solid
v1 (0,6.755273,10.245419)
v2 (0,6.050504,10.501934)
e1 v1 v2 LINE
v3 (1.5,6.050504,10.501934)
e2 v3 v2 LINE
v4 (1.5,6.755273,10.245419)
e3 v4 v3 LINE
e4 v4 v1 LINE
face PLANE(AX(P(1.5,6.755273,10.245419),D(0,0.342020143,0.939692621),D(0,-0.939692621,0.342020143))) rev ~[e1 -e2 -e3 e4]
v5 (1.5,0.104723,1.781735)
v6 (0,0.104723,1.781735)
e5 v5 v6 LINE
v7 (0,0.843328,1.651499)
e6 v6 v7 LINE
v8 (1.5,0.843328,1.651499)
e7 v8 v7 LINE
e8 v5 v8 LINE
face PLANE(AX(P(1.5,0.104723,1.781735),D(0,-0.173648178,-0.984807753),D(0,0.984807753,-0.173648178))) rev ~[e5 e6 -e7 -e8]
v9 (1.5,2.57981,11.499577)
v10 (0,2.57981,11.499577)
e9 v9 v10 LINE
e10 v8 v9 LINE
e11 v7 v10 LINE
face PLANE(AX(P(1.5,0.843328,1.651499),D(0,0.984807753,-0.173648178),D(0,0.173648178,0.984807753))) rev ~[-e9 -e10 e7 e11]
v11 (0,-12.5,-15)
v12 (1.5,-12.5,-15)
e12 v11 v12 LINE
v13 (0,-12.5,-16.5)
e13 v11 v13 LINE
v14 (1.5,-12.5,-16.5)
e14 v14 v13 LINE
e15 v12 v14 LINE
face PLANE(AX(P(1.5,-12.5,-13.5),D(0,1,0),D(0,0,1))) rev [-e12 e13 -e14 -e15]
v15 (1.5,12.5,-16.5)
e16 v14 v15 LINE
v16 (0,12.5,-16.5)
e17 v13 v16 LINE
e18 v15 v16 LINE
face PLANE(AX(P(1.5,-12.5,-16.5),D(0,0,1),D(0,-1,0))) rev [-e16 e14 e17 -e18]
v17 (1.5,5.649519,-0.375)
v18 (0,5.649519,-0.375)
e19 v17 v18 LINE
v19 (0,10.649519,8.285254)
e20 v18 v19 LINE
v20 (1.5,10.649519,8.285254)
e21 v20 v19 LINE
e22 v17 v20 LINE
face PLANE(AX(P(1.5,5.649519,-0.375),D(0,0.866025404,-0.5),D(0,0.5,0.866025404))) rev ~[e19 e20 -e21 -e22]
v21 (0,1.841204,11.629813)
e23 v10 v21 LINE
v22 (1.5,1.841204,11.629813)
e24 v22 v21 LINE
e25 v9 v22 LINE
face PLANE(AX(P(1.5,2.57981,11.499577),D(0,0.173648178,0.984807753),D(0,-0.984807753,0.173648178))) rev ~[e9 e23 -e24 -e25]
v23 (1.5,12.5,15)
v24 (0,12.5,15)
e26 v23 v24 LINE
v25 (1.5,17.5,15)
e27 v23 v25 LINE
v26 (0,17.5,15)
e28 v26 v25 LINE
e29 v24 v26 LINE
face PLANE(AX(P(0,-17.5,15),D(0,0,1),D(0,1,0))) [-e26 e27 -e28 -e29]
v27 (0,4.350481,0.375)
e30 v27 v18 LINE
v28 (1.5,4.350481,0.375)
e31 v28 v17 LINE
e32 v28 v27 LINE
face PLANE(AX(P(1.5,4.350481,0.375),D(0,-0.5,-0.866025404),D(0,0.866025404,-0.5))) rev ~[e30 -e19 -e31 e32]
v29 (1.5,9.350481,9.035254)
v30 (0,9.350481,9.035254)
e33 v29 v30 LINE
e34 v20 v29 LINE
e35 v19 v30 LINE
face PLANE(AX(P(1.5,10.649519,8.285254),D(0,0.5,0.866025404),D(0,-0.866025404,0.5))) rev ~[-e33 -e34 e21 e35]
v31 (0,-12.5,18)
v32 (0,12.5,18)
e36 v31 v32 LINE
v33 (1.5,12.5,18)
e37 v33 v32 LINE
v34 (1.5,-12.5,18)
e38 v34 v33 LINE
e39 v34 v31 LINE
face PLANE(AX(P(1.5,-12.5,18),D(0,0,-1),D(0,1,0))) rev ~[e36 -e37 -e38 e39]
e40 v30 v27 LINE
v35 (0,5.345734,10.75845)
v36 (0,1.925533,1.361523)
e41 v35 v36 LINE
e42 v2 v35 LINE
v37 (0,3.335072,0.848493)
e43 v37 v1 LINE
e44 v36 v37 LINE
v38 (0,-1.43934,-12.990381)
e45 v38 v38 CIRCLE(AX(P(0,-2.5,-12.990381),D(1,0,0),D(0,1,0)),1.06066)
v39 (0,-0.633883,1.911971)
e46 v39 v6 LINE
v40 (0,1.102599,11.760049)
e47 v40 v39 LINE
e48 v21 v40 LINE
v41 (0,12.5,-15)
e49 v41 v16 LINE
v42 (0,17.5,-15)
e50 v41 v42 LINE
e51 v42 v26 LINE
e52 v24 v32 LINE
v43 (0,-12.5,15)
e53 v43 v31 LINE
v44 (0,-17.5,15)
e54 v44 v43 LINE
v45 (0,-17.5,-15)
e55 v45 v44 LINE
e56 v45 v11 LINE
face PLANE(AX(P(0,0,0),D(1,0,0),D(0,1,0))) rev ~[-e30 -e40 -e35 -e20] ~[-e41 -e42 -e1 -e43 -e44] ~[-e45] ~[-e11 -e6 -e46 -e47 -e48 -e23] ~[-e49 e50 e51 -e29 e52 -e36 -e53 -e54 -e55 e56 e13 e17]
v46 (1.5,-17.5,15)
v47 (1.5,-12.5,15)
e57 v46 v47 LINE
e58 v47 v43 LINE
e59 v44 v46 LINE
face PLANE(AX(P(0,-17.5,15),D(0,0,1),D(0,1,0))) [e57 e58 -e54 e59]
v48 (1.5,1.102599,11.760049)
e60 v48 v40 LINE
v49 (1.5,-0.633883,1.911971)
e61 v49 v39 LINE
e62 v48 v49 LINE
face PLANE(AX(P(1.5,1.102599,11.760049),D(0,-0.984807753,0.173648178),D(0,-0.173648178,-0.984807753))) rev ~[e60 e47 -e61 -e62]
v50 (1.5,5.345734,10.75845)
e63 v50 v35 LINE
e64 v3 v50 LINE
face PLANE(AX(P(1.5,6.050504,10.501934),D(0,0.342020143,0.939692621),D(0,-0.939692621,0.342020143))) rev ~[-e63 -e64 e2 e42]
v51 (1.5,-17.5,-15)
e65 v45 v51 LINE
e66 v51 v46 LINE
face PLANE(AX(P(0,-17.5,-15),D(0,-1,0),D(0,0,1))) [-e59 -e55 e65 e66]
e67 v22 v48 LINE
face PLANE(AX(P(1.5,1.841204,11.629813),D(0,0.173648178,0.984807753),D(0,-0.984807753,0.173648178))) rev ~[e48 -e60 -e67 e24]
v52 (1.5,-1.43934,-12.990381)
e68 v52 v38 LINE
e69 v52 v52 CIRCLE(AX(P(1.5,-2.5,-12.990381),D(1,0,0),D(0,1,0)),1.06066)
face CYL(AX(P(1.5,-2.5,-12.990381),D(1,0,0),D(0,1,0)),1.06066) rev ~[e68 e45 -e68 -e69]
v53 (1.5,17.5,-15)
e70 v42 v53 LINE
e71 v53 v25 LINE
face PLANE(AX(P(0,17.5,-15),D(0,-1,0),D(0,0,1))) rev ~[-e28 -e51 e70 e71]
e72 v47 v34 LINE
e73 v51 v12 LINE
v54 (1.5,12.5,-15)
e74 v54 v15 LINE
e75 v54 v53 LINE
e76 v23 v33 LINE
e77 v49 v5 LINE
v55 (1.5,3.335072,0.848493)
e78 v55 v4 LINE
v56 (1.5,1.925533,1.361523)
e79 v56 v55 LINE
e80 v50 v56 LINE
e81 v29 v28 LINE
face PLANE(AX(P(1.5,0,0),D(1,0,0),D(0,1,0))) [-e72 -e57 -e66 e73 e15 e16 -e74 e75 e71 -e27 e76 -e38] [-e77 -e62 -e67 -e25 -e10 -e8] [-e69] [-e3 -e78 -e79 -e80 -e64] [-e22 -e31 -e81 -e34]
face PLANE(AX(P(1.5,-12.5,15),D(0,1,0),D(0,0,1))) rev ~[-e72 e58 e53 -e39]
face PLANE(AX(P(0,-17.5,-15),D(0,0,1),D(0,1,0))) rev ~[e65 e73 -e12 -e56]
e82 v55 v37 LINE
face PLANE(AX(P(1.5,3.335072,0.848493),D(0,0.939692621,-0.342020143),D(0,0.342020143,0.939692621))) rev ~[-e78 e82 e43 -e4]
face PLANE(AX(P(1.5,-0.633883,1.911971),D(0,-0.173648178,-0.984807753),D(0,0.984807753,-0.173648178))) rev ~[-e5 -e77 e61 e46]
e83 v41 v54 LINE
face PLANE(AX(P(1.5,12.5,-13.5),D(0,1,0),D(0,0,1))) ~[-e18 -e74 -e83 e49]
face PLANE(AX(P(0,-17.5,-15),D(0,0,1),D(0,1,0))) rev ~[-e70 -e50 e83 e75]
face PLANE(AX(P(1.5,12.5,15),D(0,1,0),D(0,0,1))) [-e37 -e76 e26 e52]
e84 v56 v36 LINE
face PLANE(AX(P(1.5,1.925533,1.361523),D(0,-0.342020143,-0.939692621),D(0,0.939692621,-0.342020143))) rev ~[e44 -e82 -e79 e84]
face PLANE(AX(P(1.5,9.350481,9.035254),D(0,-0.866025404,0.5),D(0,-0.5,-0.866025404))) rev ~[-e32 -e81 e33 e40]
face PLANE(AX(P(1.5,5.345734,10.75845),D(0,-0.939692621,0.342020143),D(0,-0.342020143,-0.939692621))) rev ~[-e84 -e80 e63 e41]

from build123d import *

# Parameters (mm, degrees)
F0_W     = 35
F0_H     = 30
F1_DEPTH = 1.5
F2_W     = 25
F2_H     = 3
F3_DEPTH = 1.5
F4_W     = 25
F4_H     = 1.5
F5_DEPTH = 25
F6_R     = 1.0606601718
F7_DEPTH = 1.501


# Not quite as in the source:
# - a pattern or mirror of a feature is missing from the dataset's text; its kind, count and spacing are read off the source's solid


with BuildPart() as f1:
    # F0 (on Right) → F1 (new body)
    with BuildSketch(Plane.YZ):
        Rectangle(F0_W, F0_H)
    extrude(amount=F1_DEPTH)

    # F2 (on face) → F3 (join)
    with BuildSketch(Plane.YZ.offset(1.5)):
        with Locations((0, 16.5)):
            Rectangle(F2_W, F2_H)
    f3 = extrude(amount=-F3_DEPTH)

    # F3_copies: F3 across plane
    add(f3.mirror(Plane(origin=(0, 0, 0.75), x_dir=(-1, 0, 0), z_dir=(0, 0, -1))))

    # F4 (on face) → F5 (cut)
    with BuildSketch(Plane.YZ.offset(1.5)):
        with Locations((0, -17.25)):
            Rectangle(F4_W, F4_H)
    extrude(amount=-F5_DEPTH, mode=Mode.SUBTRACT)

    # F6 (on face) → F7 (cut, through all)
    with BuildSketch(Plane.YZ.offset(1.5)):
        Polygon((-0.6338831498, 1.9119713717), (0.104722665, 1.7817352384), (0.8433284798, 1.6514991052), (2.5798102564, 11.4995766353), (1.8412044417, 11.6298127685), (1.1025986269, 11.7600489018), align=None)
        with Locations((-2.5, -12.9903810568)):
            Circle(F6_R)
        Polygon((1.9255326843, 1.3615233625), (2.6303021499, 1.105008255), (3.3350716155, 0.8484931475), (6.7552730487, 10.2454193554), (6.0505035831, 10.5019344629), (5.3457341176, 10.7584495704), align=None)
        Polygon((4.3504809472, 0.375), (5, 0), (5.6495190528, -0.375), (10.6495190528, 8.2852540378), (10, 8.6602540378), (9.3504809472, 9.0352540378), align=None)
    extrude(amount=-F7_DEPTH, mode=Mode.SUBTRACT)


solid = f1.part
